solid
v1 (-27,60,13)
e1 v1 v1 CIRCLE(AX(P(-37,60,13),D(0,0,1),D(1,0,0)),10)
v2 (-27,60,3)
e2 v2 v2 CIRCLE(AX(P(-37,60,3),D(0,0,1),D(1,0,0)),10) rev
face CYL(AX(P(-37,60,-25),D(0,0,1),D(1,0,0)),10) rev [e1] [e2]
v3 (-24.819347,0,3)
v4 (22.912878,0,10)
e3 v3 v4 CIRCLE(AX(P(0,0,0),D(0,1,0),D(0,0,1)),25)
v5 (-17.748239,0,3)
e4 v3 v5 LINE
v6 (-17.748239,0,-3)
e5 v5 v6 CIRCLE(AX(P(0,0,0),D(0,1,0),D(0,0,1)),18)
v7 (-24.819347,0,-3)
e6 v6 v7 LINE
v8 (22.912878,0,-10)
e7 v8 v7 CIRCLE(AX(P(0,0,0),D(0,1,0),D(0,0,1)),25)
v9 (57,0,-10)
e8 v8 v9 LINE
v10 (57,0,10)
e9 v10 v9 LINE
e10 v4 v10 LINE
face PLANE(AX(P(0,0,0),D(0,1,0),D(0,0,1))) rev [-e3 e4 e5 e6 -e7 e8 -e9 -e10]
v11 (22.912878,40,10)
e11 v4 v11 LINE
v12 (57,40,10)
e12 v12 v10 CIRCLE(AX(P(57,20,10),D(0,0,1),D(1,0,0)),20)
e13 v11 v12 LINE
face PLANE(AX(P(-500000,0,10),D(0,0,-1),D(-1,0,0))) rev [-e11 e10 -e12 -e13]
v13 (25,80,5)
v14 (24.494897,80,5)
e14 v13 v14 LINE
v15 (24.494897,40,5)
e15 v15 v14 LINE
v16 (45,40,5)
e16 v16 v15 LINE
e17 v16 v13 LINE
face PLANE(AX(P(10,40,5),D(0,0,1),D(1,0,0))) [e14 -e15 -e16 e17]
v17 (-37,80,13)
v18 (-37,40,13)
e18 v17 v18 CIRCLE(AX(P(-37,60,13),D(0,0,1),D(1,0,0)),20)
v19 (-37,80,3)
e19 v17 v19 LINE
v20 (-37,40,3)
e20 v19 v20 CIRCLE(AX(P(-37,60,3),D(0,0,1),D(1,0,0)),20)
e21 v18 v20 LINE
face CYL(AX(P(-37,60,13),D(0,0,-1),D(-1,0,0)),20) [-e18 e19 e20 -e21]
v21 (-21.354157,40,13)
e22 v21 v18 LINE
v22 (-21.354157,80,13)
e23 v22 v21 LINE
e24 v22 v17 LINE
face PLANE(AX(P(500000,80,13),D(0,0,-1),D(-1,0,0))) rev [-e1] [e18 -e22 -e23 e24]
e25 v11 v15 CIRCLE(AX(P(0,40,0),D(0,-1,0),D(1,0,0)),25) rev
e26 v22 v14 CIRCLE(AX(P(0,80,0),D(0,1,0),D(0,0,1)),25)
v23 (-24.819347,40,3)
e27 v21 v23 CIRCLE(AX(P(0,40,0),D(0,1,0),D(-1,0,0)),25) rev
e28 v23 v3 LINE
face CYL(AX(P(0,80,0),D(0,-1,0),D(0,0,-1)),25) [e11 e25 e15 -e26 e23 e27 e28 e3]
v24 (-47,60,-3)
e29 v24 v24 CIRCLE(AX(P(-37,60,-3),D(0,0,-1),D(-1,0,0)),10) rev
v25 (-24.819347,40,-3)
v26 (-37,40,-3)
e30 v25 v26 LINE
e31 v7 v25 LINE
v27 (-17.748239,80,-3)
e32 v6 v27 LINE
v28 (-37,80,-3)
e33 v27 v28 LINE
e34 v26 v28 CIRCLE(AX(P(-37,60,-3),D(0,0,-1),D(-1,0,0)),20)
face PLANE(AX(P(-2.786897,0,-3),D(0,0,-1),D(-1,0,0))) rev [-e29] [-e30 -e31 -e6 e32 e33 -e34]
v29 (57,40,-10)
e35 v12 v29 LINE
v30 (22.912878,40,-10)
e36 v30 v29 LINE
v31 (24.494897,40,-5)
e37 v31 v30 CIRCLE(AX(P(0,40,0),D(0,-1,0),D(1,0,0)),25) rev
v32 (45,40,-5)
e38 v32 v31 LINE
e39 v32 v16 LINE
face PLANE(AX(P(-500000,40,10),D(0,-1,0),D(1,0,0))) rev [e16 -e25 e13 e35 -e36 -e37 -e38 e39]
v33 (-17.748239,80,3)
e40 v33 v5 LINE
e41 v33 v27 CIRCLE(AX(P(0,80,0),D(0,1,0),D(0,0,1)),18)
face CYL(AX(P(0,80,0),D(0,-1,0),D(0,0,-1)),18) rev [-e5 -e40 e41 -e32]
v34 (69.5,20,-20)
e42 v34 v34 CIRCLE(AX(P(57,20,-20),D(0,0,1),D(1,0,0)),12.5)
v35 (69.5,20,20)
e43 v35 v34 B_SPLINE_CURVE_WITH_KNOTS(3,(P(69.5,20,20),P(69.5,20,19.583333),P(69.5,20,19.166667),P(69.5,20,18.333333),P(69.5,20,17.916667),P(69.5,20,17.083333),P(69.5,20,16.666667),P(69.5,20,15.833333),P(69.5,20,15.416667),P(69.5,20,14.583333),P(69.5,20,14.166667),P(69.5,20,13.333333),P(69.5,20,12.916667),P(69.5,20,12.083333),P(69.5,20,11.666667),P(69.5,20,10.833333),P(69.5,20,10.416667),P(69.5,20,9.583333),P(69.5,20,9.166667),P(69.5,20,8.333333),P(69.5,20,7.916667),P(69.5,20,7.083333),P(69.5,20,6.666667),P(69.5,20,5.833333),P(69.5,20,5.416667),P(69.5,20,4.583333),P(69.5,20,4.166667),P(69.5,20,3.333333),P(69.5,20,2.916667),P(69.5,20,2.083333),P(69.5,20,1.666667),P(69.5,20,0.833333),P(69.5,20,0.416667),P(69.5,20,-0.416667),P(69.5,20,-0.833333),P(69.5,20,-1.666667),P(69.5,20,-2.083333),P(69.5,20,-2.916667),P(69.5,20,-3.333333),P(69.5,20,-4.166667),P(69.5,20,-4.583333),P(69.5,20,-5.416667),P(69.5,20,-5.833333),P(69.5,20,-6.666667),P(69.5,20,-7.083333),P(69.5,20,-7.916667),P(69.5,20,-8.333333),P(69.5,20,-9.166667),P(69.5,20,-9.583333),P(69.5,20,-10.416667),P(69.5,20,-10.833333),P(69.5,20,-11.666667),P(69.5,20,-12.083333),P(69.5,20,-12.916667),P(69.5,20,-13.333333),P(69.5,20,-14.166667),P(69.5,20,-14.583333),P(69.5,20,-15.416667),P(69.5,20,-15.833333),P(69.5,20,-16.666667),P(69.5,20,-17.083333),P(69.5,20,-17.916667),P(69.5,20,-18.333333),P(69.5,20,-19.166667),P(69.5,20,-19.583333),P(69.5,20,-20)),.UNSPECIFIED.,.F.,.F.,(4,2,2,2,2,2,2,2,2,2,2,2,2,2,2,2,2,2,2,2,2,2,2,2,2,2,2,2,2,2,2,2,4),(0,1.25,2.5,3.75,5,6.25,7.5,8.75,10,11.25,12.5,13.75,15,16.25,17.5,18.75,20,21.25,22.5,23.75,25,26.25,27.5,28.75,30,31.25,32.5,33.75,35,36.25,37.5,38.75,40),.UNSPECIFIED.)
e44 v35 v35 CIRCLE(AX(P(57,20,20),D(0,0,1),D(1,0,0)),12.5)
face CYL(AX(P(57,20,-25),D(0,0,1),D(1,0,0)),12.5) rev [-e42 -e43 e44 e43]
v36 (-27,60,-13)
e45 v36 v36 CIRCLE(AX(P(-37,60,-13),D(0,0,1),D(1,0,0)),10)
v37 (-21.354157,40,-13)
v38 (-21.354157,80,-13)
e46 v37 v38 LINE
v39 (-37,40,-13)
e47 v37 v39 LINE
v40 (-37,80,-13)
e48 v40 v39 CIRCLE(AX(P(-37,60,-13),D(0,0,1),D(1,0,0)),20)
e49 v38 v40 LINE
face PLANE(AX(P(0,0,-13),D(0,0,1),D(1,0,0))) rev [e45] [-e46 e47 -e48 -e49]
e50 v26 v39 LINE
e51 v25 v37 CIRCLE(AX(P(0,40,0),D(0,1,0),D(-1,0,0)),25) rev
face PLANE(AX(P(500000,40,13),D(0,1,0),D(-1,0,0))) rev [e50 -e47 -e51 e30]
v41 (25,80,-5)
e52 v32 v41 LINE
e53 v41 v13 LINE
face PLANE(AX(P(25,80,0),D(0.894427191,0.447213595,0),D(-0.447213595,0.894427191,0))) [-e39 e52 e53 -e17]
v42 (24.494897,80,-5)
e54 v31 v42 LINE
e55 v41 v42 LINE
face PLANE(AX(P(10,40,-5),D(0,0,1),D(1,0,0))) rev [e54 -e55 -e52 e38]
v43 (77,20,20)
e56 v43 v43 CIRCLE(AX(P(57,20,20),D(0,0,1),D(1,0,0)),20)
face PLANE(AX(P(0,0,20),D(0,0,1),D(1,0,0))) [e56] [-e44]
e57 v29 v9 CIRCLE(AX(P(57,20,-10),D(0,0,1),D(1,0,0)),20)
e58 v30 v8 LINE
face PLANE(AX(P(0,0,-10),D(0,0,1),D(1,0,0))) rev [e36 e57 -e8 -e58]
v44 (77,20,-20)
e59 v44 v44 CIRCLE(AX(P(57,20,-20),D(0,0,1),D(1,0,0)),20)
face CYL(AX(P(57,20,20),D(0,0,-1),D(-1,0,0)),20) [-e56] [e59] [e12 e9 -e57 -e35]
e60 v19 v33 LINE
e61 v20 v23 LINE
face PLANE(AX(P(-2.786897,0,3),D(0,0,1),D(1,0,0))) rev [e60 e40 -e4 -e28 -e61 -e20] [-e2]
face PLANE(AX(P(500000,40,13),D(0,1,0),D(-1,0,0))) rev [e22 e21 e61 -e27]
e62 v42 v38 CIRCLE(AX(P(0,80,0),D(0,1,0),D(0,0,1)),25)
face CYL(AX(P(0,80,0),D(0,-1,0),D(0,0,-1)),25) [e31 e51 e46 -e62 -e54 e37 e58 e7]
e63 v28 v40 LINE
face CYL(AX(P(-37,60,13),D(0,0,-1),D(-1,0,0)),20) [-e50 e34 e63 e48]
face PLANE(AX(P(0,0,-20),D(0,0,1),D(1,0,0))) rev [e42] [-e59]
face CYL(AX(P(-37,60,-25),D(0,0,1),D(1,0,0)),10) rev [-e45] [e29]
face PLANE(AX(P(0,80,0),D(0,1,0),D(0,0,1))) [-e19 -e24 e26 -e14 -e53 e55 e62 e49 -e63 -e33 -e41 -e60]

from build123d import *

# Parameters (mm, degrees)
SKETCH1_R                = 25
SKETCH1_R_2              = 18
BOSS_EXTRUDE1_DEPTH      = 80
SKETCH2_W                = 12
SKETCH2_H                = 40
BOSS_EXTRUDE2_DEPTH      = 13
BOSS_EXTRUDE3_REACH      = 99.596
BOSS_EXTRUDE3_END_RADIUS = 25
SKETCH4_W                = 26
SKETCH4_H                = 40
SKETCH5_R                = 10
CUT_EXTRUDE1_DEPTH       = 106.32331176
BOSS_EXTRUDE4_DEPTH      = 10
SKETCH6_3_R              = 20
BOSS_EXTRUDE5_DEPTH      = 20
BOSS_EXTRUDE6_REACH      = 119.256
BOSS_EXTRUDE6_END_RADIUS = 25
SKETCH7_W                = 20
SKETCH7_H                = 40
SKETCH8_R                = 12.5
CUT_EXTRUDE2_DEPTH       = 120.808180021
RIB2_START               = -5
RIB2_DEPTH               = 10
SKETCH10_W               = 67.322464705
SKETCH10_H               = 6
CUT_EXTRUDE3_DEPTH       = 114.815640401


with BuildPart() as part:
    # Sketch1 → Boss-Extrude1 (new body)
    with BuildSketch(Plane(origin=(0, 0, 0), x_dir=(1, 0, 0), z_dir=(0, 1, 0))):
        with Locations(Location((0, 0, 0), (0, 0, 270))):
            Circle(SKETCH1_R)
        with Locations(Location((0, 0, 0), (0, 0, 270))):
            Circle(SKETCH1_R_2, mode=Mode.SUBTRACT)
    extrude(amount=BOSS_EXTRUDE1_DEPTH)



with BuildPart() as body_2:
    # Sketch2 → Boss-Extrude2 (new, symmetric)
    with BuildSketch(Plane.XY):
        with BuildLine():
            Line((-37, 80), (-37, 40))
            ThreePointArc((-37, 40), (-57, 60), (-37, 80))
        make_face()
        with Locations((-31, 60)):
            Rectangle(SKETCH2_W, SKETCH2_H)
    extrude(amount=BOSS_EXTRUDE2_DEPTH, both=True)


with BuildPart() as part_1:
    add(part.part)

    add(body_2.part)  # Boss-Extrude3 merges body 2
    # Boss-Extrude3: up to this cylinder (the profile starts outside it)
    boss_extrude3_end = Plane(origin=(0, 60, 0), z_dir=(0, -1, 0)) * Cylinder(BOSS_EXTRUDE3_END_RADIUS, 250.192, mode=Mode.PRIVATE)
    # Sketch4 → Boss-Extrude3 (add, up to the surface)
    with BuildSketch(Plane(origin=(-25, 0, 0), x_dir=(0, 0, -1), z_dir=(1, 0, 0)), mode=Mode.PRIVATE) as boss_extrude3_sk1:
        with Locations((0, 60)):
            Rectangle(SKETCH4_W, SKETCH4_H)
    boss_extrude3_tool1 = extrude(boss_extrude3_sk1.sketch, amount=BOSS_EXTRUDE3_REACH, mode=Mode.PRIVATE) - boss_extrude3_end
    add(boss_extrude3_tool1.solids().sort_by_distance((-25, 60, 0))[0])
    add(boss_extrude3_tool1.solids().sort_by_distance((-25, 60, 0))[1])

    # Sketch5 → Cut-Extrude1 (cut, through all)
    with BuildSketch(Plane.XY.offset(13)):
        with Locations((-37, 60)):
            Circle(SKETCH5_R)
    extrude(amount=-CUT_EXTRUDE1_DEPTH, mode=Mode.SUBTRACT)



with BuildPart() as body_2_2:
    # Sketch6 → Boss-Extrude4 (new, symmetric)
    with BuildSketch(Plane.XY):
        with BuildLine():
            Line((25, 40), (25, 0))
            Line((25, 0), (57, 0))
            ThreePointArc((57, 0), (37, 20), (57, 40))
            Line((57, 40), (25, 40))
        make_face()
    extrude(amount=BOSS_EXTRUDE4_DEPTH, both=True)

    # Sketch6<3> → Boss-Extrude5 (add, symmetric)
    with BuildSketch(Plane.XY):
        with Locations((57, 20)):
            Circle(SKETCH6_3_R)
    extrude(amount=BOSS_EXTRUDE5_DEPTH, both=True)


with BuildPart() as part_2:
    add(part_1.part)

    add(body_2_2.part)  # Boss-Extrude6 merges body 2 2
    # Boss-Extrude6: up to this cylinder (the profile starts outside it)
    boss_extrude6_end = Plane(origin=(0, 20, 0), z_dir=(0, -1, 0)) * Cylinder(BOSS_EXTRUDE6_END_RADIUS, 289.512, mode=Mode.PRIVATE)
    # Sketch7 → Boss-Extrude6 (add, up to the surface)
    with BuildSketch(Plane.ZY.offset(-25), mode=Mode.PRIVATE) as boss_extrude6_sk1:
        with Locations((0, 20)):
            Rectangle(SKETCH7_W, SKETCH7_H)
    boss_extrude6_tool1 = extrude(boss_extrude6_sk1.sketch, amount=BOSS_EXTRUDE6_REACH, mode=Mode.PRIVATE) - boss_extrude6_end
    add(boss_extrude6_tool1.solids().sort_by_distance((25, 20, 0))[0])
    add(boss_extrude6_tool1.solids().sort_by_distance((25, 20, 0))[1])

    # Sketch8 → Cut-Extrude2 (cut, through all)
    with BuildSketch(Plane.XY.offset(20)):
        with Locations((57, 20)):
            Circle(SKETCH8_R)
    extrude(amount=-CUT_EXTRUDE2_DEPTH, mode=Mode.SUBTRACT)

    # Rib2: read off the stored shape, not the designer's step
    # Rib2 outline → Rib2 (add)
    with BuildSketch(Plane.XY.offset(RIB2_START)):
        Polygon((25, 80), (24.494897428, 80), (24.494897428, 40), (45, 40), align=None)
    extrude(amount=RIB2_DEPTH)

    # Sketch10 → Cut-Extrude3 (cut, through all)
    with BuildSketch(Plane(origin=(0, 80, 0), x_dir=(1, 0, 0), z_dir=(0, 1, 0))):
        with Locations((-36.448129058, 0)):
            Rectangle(SKETCH10_W, SKETCH10_H)
    extrude(amount=-CUT_EXTRUDE3_DEPTH, mode=Mode.SUBTRACT)


solid = part_2.part
